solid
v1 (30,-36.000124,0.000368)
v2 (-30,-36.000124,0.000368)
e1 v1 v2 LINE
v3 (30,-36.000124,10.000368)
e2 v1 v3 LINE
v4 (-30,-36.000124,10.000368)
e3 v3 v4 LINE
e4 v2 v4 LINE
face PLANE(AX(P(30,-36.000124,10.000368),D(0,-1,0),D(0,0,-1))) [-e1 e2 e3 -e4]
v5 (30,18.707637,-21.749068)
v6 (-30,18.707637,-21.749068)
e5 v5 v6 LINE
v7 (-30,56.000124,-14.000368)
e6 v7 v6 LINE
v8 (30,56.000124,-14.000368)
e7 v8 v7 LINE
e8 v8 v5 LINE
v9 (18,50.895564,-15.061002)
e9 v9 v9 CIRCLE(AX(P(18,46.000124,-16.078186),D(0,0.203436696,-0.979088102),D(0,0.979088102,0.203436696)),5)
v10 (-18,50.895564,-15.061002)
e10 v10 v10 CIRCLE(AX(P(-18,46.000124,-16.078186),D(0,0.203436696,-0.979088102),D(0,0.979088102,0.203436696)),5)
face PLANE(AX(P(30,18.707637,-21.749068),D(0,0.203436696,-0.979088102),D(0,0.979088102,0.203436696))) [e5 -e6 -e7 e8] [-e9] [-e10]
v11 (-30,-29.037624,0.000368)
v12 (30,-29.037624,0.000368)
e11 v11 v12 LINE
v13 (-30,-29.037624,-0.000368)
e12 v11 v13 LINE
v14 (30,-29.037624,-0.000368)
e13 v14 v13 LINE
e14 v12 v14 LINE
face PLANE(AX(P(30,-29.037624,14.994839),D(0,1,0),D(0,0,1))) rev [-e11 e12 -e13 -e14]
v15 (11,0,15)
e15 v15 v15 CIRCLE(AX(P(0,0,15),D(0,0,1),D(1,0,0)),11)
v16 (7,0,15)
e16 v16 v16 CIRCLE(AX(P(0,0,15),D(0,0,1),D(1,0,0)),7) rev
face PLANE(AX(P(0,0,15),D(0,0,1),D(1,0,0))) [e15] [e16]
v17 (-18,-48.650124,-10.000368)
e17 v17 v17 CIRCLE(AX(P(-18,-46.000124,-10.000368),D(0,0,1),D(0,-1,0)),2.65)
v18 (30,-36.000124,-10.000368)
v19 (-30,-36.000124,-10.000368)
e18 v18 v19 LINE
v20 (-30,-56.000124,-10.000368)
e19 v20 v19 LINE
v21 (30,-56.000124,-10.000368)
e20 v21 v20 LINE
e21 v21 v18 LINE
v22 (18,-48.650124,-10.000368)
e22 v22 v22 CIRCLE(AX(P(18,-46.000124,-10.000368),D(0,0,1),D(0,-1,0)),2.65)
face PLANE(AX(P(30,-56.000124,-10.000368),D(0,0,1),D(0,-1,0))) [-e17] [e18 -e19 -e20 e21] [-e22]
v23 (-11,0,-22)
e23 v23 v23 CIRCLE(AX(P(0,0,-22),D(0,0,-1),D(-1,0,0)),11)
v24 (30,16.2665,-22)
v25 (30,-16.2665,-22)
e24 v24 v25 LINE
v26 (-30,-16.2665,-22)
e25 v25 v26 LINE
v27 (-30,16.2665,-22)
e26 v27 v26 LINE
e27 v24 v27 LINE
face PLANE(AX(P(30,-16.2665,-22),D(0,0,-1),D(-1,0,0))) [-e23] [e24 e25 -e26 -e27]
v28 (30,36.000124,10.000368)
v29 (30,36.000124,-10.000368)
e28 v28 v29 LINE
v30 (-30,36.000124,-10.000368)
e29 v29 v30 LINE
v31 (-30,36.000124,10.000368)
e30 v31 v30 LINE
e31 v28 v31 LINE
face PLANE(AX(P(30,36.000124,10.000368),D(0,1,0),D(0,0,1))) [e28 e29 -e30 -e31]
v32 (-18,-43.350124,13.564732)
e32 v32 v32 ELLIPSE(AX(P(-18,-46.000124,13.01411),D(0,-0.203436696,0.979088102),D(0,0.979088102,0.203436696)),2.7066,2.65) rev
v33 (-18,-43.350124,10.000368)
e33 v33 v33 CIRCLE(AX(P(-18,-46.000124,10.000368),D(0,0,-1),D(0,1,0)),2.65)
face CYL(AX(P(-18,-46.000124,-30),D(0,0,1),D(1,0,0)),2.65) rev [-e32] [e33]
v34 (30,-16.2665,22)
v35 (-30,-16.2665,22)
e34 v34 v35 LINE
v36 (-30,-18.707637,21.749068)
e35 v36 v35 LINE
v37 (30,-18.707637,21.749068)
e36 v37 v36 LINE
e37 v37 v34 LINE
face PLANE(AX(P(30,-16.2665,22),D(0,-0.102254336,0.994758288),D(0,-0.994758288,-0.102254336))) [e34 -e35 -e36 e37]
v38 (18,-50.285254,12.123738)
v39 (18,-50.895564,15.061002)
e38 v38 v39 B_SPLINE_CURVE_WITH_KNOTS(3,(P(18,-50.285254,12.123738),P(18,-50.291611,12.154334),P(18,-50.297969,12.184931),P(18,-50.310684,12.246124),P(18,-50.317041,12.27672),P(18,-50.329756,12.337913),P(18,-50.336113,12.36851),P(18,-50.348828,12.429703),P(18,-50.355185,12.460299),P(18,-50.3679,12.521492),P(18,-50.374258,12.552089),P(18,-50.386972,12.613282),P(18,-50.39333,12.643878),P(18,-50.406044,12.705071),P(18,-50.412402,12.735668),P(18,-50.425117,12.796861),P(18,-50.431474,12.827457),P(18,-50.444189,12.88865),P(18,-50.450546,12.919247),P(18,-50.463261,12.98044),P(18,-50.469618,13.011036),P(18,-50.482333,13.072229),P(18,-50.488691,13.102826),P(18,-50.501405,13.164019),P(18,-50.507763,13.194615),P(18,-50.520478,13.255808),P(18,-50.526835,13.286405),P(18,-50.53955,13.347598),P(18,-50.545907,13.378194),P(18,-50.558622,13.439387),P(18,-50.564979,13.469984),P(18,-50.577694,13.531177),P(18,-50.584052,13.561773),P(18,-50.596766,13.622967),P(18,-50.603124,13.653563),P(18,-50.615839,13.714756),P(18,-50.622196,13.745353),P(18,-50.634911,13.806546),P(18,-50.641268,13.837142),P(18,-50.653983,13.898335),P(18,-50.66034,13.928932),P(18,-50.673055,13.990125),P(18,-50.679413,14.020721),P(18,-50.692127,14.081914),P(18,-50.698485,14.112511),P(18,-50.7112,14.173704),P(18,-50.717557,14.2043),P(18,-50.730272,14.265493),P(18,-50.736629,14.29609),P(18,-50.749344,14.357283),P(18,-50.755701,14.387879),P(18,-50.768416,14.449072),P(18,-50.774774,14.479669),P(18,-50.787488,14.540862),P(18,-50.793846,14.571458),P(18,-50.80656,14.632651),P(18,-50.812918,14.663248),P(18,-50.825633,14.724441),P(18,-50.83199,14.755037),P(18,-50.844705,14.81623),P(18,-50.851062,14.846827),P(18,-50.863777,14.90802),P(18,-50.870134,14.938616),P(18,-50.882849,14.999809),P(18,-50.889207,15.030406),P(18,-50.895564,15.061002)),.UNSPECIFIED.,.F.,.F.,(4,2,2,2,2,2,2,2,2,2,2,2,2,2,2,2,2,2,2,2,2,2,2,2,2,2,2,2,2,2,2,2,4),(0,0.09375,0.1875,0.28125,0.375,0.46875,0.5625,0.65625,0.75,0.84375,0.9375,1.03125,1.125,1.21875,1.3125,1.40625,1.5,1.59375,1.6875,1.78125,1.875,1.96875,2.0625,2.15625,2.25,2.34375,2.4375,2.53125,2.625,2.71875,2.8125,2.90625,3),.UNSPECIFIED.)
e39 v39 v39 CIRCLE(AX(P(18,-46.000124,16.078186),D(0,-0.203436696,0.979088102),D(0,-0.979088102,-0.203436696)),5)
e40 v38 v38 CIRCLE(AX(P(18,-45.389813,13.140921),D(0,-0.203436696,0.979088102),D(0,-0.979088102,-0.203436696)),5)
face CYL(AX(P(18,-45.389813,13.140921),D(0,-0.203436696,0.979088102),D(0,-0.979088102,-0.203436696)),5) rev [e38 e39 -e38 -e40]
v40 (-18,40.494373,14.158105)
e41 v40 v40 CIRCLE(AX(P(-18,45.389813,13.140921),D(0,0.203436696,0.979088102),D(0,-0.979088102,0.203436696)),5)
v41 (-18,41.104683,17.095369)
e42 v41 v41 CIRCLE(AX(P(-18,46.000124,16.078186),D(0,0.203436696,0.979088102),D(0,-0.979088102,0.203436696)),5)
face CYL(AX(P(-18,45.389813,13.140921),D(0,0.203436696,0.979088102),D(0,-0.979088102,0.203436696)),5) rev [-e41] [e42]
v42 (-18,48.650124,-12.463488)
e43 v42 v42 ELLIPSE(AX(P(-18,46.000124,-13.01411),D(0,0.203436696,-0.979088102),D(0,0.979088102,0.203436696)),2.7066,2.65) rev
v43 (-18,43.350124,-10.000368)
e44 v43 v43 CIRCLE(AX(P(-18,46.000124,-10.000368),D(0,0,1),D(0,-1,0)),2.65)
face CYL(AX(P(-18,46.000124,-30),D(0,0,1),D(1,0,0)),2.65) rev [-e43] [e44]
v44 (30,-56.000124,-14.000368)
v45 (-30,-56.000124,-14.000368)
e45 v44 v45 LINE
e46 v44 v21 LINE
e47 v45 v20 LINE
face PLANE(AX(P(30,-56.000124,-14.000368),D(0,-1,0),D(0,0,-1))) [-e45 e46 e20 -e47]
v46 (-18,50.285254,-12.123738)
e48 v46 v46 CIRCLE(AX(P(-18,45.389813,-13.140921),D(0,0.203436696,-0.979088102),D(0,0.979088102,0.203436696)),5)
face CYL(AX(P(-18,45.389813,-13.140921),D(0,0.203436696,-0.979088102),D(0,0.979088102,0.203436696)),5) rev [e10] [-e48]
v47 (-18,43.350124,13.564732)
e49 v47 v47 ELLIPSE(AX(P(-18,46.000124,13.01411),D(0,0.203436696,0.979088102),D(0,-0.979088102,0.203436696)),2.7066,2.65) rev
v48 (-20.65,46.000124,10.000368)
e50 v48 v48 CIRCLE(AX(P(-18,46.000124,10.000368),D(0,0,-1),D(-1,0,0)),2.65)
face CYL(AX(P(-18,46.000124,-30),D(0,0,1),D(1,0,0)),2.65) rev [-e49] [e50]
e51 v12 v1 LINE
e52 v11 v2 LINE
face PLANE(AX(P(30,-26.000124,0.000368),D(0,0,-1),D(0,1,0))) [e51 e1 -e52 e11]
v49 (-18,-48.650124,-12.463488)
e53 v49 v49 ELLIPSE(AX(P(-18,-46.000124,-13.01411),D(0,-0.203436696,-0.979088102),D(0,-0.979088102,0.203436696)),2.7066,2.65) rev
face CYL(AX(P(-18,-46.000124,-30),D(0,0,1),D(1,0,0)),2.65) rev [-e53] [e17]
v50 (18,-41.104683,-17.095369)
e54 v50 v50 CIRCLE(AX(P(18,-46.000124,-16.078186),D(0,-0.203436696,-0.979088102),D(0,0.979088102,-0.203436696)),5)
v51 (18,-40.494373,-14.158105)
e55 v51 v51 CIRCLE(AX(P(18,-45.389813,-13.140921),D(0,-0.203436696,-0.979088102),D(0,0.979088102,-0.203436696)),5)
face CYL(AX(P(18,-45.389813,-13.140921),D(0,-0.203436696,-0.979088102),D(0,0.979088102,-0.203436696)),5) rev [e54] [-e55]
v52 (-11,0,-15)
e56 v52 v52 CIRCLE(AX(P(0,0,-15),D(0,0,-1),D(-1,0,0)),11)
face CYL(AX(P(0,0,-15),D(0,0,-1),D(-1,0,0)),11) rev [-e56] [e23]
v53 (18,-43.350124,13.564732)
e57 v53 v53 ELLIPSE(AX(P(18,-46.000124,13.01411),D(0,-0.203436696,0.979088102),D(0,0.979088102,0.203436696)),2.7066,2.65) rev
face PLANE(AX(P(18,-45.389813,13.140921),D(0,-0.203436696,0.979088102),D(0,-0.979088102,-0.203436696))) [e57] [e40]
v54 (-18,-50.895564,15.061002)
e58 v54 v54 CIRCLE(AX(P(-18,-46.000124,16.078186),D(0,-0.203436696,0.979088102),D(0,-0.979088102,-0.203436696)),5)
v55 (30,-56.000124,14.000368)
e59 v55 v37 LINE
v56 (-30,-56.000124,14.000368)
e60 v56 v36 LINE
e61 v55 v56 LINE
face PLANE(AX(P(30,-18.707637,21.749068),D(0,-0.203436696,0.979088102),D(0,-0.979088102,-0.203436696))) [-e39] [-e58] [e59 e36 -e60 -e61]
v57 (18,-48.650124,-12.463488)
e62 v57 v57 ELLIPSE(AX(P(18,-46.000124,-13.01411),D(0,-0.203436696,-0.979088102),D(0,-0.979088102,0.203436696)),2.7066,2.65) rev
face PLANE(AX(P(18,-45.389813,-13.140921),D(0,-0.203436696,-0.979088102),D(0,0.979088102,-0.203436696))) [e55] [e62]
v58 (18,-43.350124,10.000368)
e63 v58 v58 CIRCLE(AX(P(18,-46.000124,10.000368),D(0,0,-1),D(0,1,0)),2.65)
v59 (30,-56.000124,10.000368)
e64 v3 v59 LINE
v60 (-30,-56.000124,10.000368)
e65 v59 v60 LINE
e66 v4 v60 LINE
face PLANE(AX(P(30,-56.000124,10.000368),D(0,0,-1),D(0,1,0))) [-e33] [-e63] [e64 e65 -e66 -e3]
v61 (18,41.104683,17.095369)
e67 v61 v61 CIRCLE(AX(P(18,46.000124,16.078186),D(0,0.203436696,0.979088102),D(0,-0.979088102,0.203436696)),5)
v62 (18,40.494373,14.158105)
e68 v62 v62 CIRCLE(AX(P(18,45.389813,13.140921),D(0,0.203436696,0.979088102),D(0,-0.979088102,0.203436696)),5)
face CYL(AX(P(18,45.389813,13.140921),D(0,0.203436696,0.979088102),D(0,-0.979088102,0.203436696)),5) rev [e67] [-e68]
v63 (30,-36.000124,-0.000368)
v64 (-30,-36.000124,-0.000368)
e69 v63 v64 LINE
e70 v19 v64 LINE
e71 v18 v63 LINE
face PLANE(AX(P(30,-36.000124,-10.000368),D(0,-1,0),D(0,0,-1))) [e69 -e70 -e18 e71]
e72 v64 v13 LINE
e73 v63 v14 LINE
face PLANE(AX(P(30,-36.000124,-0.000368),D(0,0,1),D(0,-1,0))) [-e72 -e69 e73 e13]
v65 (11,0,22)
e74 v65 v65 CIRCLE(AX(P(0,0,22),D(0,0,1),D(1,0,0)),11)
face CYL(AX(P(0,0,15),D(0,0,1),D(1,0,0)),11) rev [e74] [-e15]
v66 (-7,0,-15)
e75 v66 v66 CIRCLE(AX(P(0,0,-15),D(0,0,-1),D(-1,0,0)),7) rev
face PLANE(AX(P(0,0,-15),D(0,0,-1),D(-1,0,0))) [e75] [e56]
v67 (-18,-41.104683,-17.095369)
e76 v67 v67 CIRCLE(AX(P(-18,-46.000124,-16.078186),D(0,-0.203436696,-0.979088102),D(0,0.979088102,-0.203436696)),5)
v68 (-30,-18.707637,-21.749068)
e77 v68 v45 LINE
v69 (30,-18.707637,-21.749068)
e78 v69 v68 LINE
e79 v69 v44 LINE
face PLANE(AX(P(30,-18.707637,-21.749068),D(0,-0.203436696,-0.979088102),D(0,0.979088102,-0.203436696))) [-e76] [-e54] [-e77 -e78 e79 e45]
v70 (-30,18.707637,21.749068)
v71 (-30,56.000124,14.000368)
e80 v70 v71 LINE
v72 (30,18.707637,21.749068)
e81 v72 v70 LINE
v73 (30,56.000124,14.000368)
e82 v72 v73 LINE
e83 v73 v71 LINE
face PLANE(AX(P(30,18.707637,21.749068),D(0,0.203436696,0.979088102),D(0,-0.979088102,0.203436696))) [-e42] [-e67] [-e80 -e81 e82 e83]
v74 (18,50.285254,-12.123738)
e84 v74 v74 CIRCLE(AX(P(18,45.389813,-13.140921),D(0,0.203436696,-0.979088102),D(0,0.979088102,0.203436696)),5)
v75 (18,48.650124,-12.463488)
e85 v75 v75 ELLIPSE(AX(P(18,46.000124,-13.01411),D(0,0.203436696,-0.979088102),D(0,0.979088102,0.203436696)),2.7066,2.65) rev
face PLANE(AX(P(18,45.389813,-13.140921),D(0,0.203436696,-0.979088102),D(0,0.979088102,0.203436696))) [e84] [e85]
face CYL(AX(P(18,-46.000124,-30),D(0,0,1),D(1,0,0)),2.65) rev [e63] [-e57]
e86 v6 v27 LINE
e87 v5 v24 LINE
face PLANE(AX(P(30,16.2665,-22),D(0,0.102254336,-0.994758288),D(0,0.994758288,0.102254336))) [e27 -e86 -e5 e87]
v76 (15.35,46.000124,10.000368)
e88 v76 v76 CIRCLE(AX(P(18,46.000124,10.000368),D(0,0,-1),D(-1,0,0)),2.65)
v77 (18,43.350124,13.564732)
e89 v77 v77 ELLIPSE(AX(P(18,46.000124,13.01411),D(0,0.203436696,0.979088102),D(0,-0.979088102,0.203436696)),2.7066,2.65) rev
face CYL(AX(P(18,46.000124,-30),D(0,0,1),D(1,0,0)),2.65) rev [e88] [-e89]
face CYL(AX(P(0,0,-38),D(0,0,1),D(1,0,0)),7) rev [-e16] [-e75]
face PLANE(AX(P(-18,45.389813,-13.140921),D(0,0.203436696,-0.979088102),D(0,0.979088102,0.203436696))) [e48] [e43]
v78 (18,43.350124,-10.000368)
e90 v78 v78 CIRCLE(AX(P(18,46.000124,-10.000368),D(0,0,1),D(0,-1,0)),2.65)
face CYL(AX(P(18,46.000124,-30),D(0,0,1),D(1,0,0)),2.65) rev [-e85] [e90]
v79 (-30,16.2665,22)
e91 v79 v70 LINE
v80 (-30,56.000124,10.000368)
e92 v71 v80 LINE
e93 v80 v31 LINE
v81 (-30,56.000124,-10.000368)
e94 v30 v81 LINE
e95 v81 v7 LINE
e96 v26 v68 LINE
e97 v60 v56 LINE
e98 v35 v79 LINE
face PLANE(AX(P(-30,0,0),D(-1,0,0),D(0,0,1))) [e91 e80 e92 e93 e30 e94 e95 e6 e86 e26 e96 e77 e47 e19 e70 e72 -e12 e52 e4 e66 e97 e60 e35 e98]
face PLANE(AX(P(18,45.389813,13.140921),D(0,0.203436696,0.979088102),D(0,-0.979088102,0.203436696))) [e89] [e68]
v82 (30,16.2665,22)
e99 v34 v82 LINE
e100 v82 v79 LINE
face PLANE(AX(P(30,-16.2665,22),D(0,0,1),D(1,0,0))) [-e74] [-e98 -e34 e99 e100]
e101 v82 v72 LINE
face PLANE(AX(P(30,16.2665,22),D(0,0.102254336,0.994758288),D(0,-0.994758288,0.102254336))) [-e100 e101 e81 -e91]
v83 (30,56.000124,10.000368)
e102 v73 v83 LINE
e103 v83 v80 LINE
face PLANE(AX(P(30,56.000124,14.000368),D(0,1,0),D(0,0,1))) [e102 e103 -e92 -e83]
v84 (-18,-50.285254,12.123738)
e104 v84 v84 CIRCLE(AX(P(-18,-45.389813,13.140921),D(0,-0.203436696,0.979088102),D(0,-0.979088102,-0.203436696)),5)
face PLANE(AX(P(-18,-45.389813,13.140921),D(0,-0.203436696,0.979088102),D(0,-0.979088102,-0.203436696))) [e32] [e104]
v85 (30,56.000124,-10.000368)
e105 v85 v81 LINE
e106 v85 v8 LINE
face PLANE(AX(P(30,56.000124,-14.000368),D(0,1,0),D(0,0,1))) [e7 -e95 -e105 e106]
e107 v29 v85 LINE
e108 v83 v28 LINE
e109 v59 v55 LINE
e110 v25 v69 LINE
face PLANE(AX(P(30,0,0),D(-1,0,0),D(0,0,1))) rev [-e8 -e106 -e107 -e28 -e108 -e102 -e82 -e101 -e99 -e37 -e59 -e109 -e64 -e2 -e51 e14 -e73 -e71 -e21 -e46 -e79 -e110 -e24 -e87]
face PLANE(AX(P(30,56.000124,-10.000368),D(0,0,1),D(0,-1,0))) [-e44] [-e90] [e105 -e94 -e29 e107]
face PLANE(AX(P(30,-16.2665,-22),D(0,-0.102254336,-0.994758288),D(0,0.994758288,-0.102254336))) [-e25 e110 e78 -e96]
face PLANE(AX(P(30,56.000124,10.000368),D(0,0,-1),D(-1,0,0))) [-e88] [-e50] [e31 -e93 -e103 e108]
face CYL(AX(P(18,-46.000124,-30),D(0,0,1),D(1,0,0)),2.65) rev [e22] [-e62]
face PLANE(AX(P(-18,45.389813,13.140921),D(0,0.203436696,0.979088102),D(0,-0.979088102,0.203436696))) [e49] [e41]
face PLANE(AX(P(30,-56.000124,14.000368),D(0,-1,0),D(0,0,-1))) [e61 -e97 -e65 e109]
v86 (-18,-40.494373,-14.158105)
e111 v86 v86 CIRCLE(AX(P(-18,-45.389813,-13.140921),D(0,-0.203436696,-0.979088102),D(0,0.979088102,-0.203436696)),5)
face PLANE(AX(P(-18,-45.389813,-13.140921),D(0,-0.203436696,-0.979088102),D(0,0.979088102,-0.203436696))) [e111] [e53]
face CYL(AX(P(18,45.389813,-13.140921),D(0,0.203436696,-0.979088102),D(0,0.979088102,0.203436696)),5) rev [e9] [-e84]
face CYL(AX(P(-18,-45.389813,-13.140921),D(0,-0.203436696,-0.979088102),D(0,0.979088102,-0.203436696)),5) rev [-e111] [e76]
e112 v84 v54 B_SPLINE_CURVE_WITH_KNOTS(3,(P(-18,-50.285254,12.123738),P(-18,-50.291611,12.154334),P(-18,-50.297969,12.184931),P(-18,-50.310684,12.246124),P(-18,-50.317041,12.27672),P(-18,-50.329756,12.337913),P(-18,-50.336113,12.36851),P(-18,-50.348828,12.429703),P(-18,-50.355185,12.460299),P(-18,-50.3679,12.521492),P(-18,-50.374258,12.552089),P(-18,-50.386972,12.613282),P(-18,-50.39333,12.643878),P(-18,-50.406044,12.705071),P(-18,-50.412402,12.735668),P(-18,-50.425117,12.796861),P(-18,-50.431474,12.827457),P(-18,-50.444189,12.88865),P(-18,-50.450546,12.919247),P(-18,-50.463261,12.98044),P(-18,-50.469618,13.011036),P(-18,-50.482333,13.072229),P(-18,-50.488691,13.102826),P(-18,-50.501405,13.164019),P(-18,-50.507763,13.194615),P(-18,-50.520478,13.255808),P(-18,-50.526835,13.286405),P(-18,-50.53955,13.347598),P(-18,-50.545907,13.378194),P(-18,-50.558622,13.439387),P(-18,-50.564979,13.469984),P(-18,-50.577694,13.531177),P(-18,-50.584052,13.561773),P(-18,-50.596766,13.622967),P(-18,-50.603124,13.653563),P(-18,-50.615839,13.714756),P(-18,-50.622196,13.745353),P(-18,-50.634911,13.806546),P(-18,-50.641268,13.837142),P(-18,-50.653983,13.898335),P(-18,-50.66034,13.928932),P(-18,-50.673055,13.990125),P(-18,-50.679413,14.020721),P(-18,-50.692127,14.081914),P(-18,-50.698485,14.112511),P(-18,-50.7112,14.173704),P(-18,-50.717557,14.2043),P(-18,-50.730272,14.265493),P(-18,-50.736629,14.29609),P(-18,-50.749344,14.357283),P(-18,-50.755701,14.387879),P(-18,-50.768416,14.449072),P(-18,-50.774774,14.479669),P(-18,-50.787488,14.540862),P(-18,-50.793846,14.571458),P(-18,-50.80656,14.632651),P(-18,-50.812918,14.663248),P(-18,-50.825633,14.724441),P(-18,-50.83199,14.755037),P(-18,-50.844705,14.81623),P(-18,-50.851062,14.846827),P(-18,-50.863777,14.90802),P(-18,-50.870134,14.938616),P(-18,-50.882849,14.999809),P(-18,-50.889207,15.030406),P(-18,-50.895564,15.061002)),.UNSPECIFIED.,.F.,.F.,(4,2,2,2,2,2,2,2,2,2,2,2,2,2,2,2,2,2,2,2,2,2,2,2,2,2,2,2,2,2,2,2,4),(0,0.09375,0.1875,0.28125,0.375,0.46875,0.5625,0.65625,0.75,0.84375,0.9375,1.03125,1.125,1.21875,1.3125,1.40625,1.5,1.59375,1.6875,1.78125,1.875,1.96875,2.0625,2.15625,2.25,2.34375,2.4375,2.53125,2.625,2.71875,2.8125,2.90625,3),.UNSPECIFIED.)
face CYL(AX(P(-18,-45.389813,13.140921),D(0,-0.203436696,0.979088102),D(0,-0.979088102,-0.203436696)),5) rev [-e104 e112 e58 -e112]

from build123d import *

# Parameters (mm, degrees)
EXTRUIR_L_MINA1_START   = -30
EXTRUIR_L_MINA1_DEPTH   = 60
CROQUIS2_W              = 29.989677058
CROQUIS2_H              = 58.075247638
SALIENTE_EXTRUIR1_DEPTH = 30
CROQUIS3_R              = 7
CORTAR_EXTRUIR1_DEPTH   = 60
CROQUIS4_R              = 11
CORTAR_EXTRUIR2_DEPTH   = 7
CORTAR_EXTRUIR3_START   = -7
CROQUIS5_R              = 11
CORTAR_EXTRUIR3_DEPTH   = 7
CROQUIS7_R              = 2.65
CORTAR_EXTRUIR4_DEPTH   = 30
CROQUIS8_R              = 5
CORTAR_EXTRUIR5_DEPTH   = 3
CROQUIS9_R              = 5
CORTAR_EXTRUIR6_DEPTH   = 3
CROQUIS10_R             = 5
CORTAR_EXTRUIR7_DEPTH   = 3
CROQUIS11_R             = 5
CORTAR_EXTRUIR8_DEPTH   = 3


# Read off the part's stored shape, not the designer's step: Extruir-Lámina1
with BuildPart() as part:
    # Extruir-Lámina1 outline → Extruir-Lámina1 (new body)
    with BuildSketch(Plane(origin=(0, 0, 0), x_dir=(0, 0, -1), z_dir=(1, 0, 0)).offset(EXTRUIR_L_MINA1_START)):
        Polygon((10.020236328, -26.000123541), (0.000367551, -26.000123541), (0.000367551, -36.000123541), (10.000367551, -36.000123541), (10.000367551, -56.000123541), (14.000367551, -56.000123541), (21.74906786, -18.707636838), (22, -16.2665), (22, 16.2665), (21.74906786, 18.707636838), (14.000367551, 56.000123541), (10.000367551, 56.000123541), (10.000367551, 36.000123541), (-10.000367551, 36.000123541), (-10.000367551, 56.000123541), (-14.000367551, 56.000123541), (-21.74906786, 18.707636838), (-22, 16.2665), (-22, -16.2665), (-21.74906786, -18.707636838), (-14.000367551, -56.000123541), (-10.000367551, -56.000123541), (-10.000367551, -36.000123541), (-0.000367551, -36.000123541), (-0.000367551, -26.000123541), (-10.020236328, -26.000123541), (-11.853902107, -17.175165292), (-12, -15.753884831), (-12, 15.753884831), (-11.853902107, 17.175165292), (-10.020236328, 26.000123541), (10.020236328, 26.000123541), (11.853902107, 17.175165292), (12, 15.753884831), (12, -15.753884831), (11.853902107, -17.175165292), align=None)
    extrude(amount=EXTRUIR_L_MINA1_DEPTH)

    # Croquis2 → Saliente-Extruir1 (add, symmetric)
    with BuildSketch(Plane(origin=(0, 0, 0), x_dir=(0, 0, -1), z_dir=(1, 0, 0))):
        Rectangle(CROQUIS2_W, CROQUIS2_H)
    extrude(amount=SALIENTE_EXTRUIR1_DEPTH, both=True)

    # Croquis3 → Cortar-Extruir1 (cut)
    with BuildSketch(Plane.XY.offset(22)):
        Circle(CROQUIS3_R)
    extrude(amount=-CORTAR_EXTRUIR1_DEPTH, mode=Mode.SUBTRACT)

    # Croquis4 → Cortar-Extruir2 (cut)
    with BuildSketch(Plane.XY.offset(22)):
        Circle(CROQUIS4_R)
    extrude(amount=-CORTAR_EXTRUIR2_DEPTH, mode=Mode.SUBTRACT)

    # Croquis5 → Cortar-Extruir3 (cut)
    with BuildSketch(Plane(origin=(0, 0, -22), x_dir=(-1, 0, 0), z_dir=(0, 0, -1)).offset(CORTAR_EXTRUIR3_START)):
        with Locations(Location((0, 0, 0), (0, 0, 180))):
            Circle(CROQUIS5_R)
    extrude(amount=CORTAR_EXTRUIR3_DEPTH, mode=Mode.SUBTRACT)

    # Croquis7 → Cortar-Extruir4 (cut, symmetric)
    with BuildSketch(Plane.XY):
        with Locations(Location((-18, 46.000123541, 0), (0, 0, 270))):
            Circle(CROQUIS7_R)
        with Locations(Location((18, 46.000123541, 0), (0, 0, 270))):
            Circle(CROQUIS7_R)
        with Locations(Location((-18, -46.000123541, 0), (0, 0, 90))):
            Circle(CROQUIS7_R)
        with Locations(Location((18, -46.000123541, 0), (0, 0, 90))):
            Circle(CROQUIS7_R)
    extrude(amount=CORTAR_EXTRUIR4_DEPTH, both=True, mode=Mode.SUBTRACT)

    # Croquis8 → Cortar-Extruir5 (cut)
    with BuildSketch(Plane(origin=(0, 5.106275996, 24.575183206), x_dir=(1, 0, 0), z_dir=(0, 0.20343669587104055, 0.979088101640028))):
        with Locations(Location((-18, 41.767280673, 0), (0, 0, 270))):
            Circle(CROQUIS8_R)
        with Locations(Location((18, 41.767280673, 0), (0, 0, 270))):
            Circle(CROQUIS8_R)
    extrude(amount=-CORTAR_EXTRUIR5_DEPTH, mode=Mode.SUBTRACT)

    # Croquis9 → Cortar-Extruir6 (cut)
    with BuildSketch(Plane(origin=(0, -5.106275996, 24.575183206), x_dir=(1, 0, 0), z_dir=(0, -0.2034366958710477, 0.9790881016400266))):
        with Locations(Location((-18, -41.767280673, 0), (0, 0, 270))):
            Circle(CROQUIS9_R)
        with Locations(Location((18, -41.767280673, 0), (0, 0, 270))):
            Circle(CROQUIS9_R)
    extrude(amount=-CORTAR_EXTRUIR6_DEPTH, mode=Mode.SUBTRACT)

    # Croquis10 → Cortar-Extruir7 (cut)
    with BuildSketch(Plane(origin=(0, 5.106275996, -24.575183206), x_dir=(-1, 0, 0), z_dir=(0, 0.2034366958710399, -0.9790881016400281))):
        with Locations(Location((-18, 41.767280673, 0), (0, 0, 90))):
            Circle(CROQUIS10_R)
        with Locations(Location((18, 41.767280673, 0), (0, 0, 90))):
            Circle(CROQUIS10_R)
    extrude(amount=-CORTAR_EXTRUIR7_DEPTH, mode=Mode.SUBTRACT)

    # Croquis11 → Cortar-Extruir8 (cut)
    with BuildSketch(Plane(origin=(0, -5.106275996, -24.575183206), x_dir=(-1, 0, 0), z_dir=(0, -0.20343669587104735, -0.9790881016400267))):
        with Locations(Location((-18, -41.767280673, 0), (0, 0, 90))):
            Circle(CROQUIS11_R)
        with Locations(Location((18, -41.767280673, 0), (0, 0, 90))):
            Circle(CROQUIS11_R)
    extrude(amount=-CORTAR_EXTRUIR8_DEPTH, mode=Mode.SUBTRACT)


solid = part.part
